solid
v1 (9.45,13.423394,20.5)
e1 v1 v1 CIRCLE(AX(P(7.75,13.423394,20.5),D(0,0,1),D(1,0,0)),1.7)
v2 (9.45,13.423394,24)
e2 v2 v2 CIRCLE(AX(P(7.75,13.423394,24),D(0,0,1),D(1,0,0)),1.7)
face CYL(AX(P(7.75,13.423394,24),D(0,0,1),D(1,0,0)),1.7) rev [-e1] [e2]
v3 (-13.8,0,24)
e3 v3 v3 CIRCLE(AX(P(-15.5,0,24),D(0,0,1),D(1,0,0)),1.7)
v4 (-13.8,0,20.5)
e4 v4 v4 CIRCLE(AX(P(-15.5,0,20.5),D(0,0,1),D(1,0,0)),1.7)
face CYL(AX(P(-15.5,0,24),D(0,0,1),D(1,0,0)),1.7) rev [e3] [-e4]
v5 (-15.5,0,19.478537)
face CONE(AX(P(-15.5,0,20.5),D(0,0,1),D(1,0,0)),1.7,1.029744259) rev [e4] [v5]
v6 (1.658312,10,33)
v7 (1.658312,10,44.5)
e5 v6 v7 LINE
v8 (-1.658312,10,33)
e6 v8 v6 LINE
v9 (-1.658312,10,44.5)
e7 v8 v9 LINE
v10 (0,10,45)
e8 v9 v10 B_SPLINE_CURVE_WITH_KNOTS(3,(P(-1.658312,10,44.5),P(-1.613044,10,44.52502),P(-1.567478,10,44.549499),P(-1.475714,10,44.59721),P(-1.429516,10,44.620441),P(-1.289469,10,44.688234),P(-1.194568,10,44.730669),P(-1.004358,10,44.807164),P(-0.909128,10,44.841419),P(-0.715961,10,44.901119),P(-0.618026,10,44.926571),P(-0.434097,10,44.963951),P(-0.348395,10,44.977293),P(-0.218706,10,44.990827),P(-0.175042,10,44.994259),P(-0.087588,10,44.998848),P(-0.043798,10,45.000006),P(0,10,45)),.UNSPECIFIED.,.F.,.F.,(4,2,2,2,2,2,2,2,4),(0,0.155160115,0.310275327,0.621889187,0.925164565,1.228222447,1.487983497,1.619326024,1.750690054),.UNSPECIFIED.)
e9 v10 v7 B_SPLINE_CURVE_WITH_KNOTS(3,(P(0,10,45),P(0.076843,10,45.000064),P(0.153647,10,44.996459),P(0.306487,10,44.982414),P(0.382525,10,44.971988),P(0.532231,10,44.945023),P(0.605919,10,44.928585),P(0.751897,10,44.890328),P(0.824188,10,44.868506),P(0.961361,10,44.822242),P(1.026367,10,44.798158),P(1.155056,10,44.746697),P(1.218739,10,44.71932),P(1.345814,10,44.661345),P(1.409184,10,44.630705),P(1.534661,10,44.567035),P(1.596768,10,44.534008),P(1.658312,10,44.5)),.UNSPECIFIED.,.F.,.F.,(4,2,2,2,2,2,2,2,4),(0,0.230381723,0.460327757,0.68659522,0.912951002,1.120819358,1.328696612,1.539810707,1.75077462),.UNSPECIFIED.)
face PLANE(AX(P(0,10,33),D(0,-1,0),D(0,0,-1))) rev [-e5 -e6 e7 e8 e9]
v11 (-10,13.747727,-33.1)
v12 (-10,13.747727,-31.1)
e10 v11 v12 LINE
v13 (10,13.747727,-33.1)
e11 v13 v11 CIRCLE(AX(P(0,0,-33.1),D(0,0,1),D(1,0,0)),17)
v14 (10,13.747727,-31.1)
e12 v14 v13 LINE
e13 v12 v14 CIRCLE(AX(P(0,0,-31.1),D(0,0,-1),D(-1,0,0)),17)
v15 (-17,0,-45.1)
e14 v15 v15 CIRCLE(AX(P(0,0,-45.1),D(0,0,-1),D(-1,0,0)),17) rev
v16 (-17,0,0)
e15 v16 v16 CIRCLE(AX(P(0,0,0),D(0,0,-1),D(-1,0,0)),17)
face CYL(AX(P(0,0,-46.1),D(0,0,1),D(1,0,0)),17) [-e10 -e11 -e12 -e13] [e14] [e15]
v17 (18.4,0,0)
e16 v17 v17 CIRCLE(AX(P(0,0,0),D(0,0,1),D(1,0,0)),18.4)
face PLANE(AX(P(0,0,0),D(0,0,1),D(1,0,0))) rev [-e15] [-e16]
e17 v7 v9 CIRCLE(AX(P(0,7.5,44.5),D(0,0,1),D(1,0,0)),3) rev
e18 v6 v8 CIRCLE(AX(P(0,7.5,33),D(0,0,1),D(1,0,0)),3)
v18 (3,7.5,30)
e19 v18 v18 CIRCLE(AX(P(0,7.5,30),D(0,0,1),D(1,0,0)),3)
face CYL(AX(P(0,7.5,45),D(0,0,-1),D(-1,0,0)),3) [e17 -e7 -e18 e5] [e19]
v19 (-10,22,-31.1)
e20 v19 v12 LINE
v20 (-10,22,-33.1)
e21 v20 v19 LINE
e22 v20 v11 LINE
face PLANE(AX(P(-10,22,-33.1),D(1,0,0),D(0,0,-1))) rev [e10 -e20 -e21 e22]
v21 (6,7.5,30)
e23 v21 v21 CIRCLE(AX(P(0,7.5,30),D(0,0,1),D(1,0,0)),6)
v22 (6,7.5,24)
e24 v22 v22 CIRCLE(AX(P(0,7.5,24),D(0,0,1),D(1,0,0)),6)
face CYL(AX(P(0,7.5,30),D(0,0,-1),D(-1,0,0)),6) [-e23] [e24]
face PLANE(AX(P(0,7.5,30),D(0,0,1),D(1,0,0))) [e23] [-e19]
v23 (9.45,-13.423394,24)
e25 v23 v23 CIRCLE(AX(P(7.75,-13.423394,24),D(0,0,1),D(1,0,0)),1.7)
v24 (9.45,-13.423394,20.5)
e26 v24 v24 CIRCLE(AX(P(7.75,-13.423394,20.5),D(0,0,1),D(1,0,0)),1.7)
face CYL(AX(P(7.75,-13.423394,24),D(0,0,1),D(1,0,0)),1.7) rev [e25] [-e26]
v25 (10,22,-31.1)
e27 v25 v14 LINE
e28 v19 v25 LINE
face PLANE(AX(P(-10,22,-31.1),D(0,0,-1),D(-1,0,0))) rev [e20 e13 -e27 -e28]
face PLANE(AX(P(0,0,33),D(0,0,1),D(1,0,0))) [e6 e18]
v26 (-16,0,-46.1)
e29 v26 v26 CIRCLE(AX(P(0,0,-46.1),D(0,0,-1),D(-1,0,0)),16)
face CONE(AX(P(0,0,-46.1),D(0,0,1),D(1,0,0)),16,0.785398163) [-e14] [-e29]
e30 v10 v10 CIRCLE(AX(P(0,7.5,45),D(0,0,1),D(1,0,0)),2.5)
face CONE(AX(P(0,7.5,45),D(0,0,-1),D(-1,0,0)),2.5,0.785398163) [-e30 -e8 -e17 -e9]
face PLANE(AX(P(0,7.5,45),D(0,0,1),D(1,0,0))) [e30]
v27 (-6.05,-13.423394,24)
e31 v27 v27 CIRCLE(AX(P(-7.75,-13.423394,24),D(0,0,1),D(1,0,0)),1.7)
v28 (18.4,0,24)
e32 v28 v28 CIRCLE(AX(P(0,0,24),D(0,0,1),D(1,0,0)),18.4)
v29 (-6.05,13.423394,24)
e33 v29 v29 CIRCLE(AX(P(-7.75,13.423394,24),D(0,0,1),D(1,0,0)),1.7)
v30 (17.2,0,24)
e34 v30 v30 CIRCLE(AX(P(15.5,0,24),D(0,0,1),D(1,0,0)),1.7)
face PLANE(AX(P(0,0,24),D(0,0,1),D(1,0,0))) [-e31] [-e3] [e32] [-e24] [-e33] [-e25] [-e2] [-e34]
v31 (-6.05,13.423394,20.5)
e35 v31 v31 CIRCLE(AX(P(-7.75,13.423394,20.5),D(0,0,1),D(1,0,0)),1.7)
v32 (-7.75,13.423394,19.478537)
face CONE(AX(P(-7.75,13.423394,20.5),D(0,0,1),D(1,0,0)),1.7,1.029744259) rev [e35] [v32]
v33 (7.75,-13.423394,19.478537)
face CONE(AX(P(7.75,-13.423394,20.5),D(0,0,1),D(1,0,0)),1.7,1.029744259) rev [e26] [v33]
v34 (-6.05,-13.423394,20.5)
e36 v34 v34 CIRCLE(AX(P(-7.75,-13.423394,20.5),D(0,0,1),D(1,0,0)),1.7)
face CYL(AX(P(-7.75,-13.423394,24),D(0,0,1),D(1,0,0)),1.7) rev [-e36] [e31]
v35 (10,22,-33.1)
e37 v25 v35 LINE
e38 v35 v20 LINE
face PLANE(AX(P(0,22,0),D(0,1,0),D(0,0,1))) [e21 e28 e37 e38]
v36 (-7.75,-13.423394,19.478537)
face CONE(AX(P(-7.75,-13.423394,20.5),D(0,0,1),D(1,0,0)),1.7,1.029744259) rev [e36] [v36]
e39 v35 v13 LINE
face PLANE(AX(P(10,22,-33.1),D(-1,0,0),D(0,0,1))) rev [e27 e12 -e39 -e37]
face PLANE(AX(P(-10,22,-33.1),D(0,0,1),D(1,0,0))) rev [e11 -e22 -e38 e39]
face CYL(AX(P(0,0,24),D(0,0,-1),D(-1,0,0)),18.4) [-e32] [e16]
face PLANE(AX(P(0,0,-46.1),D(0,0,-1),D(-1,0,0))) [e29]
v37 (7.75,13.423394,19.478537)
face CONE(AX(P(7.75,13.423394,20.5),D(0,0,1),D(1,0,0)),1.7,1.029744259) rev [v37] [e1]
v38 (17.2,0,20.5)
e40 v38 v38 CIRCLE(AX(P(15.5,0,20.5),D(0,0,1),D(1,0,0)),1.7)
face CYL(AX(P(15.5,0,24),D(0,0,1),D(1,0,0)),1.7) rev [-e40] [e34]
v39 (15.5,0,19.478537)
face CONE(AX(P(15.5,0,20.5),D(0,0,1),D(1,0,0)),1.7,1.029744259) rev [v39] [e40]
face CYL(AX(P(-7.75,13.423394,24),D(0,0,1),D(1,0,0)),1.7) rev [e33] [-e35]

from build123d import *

# Parameters (mm, degrees)
SKETCH2_R           = 18.4
BOSS_EXTRUDE1_DEPTH = 24
SKETCH3_R           = 17
BOSS_EXTRUDE2_DEPTH = 46.1
CHAMFER1_SIZE       = 1
SKETCH6_R           = 6
BOSS_EXTRUDE5_DEPTH = 6
SKETCH7_R           = 3
BOSS_EXTRUDE6_DEPTH = 15
CUT_EXTRUDE1_DEPTH  = 12
CHAMFER2_SIZE       = 0.5
CIRPATTERN1_COUNT   = 6
SKETCH11_W          = 20
SKETCH11_H          = 2
BOSS_EXTRUDE7_DEPTH = 22


with BuildPart() as part:
    # Sketch2 → Boss-Extrude1 (new body)
    with BuildSketch(Plane.XY):
        Circle(SKETCH2_R)
    extrude(amount=BOSS_EXTRUDE1_DEPTH)

    # Sketch3 → Boss-Extrude2 (add)
    with BuildSketch(Plane(origin=(0, 0, 0), x_dir=(-1, 0, 0), z_dir=(0, 0, -1))):
        Circle(SKETCH3_R)
    extrude(amount=BOSS_EXTRUDE2_DEPTH)

    # Chamfer1
    chamfer1_edges = [part.edges().sort_by_distance(p)[0] for p in [
        (17, 0, -46.1),
    ]]
    chamfer(chamfer1_edges, length=CHAMFER1_SIZE)

    # Sketch6 → Boss-Extrude5 (add)
    with BuildSketch(Plane.XY.offset(24)):
        with Locations((0, 7.5)):
            Circle(SKETCH6_R)
    extrude(amount=BOSS_EXTRUDE5_DEPTH)

    # Sketch7 → Boss-Extrude6 (add)
    with BuildSketch(Plane.XY.offset(30)):
        with Locations((0, 7.5)):
            Circle(SKETCH7_R)
    extrude(amount=BOSS_EXTRUDE6_DEPTH)

    # Sketch8 → Cut-Extrude1 (cut)
    with BuildSketch(Plane.XY.offset(45)):
        Polygon((-81.196672921, 10), (-1.658312395, 10), (1.658312395, 10), (81.196672921, 10), (81.196672921, 169.076721051), (-81.196672921, 169.076721051), align=None)
    extrude(amount=-CUT_EXTRUDE1_DEPTH, mode=Mode.SUBTRACT)

    # Chamfer2
    chamfer2_edges = [part.edges().sort_by_distance(p)[0] for p in [
        (-1.418637165, 4.856617963, 45),
    ]]
    chamfer(chamfer2_edges, length=CHAMFER2_SIZE - 0.0001)  # a hair under: the kernel refuses the full size

    # Sketch10 → M3 Clearance Hole1 (revolve, cut)
    with BuildSketch(Plane(origin=(-15.5, 0, 24), x_dir=(0, -1, 0), z_dir=(1, 0, 0))):
        Polygon((0, 0), (0, 4.521463052), (1.7, 3.5), (1.7, 0), align=None)
    m3_clearance_hole1 = revolve(axis=Axis((-15.5, 0, 30.35), (0, 0, -1)), mode=Mode.SUBTRACT)

    # CirPattern1: M3 Clearance Hole1 ×6 about axis
    cirpattern1_axis = Axis((0, 0, 0), (0, 0, 1))
    for i in range(1, CIRPATTERN1_COUNT):
        add(m3_clearance_hole1.rotate(cirpattern1_axis, i * 360 / CIRPATTERN1_COUNT), mode=Mode.SUBTRACT)

    # Sketch11 → Boss-Extrude7 (add)
    with BuildSketch(Plane(origin=(0, 0, 0), x_dir=(1, 0, 0), z_dir=(0, 1, 0))):
        with Locations((0, 32.1)):
            Rectangle(SKETCH11_W, SKETCH11_H)
    extrude(amount=BOSS_EXTRUDE7_DEPTH)


solid = part.part
